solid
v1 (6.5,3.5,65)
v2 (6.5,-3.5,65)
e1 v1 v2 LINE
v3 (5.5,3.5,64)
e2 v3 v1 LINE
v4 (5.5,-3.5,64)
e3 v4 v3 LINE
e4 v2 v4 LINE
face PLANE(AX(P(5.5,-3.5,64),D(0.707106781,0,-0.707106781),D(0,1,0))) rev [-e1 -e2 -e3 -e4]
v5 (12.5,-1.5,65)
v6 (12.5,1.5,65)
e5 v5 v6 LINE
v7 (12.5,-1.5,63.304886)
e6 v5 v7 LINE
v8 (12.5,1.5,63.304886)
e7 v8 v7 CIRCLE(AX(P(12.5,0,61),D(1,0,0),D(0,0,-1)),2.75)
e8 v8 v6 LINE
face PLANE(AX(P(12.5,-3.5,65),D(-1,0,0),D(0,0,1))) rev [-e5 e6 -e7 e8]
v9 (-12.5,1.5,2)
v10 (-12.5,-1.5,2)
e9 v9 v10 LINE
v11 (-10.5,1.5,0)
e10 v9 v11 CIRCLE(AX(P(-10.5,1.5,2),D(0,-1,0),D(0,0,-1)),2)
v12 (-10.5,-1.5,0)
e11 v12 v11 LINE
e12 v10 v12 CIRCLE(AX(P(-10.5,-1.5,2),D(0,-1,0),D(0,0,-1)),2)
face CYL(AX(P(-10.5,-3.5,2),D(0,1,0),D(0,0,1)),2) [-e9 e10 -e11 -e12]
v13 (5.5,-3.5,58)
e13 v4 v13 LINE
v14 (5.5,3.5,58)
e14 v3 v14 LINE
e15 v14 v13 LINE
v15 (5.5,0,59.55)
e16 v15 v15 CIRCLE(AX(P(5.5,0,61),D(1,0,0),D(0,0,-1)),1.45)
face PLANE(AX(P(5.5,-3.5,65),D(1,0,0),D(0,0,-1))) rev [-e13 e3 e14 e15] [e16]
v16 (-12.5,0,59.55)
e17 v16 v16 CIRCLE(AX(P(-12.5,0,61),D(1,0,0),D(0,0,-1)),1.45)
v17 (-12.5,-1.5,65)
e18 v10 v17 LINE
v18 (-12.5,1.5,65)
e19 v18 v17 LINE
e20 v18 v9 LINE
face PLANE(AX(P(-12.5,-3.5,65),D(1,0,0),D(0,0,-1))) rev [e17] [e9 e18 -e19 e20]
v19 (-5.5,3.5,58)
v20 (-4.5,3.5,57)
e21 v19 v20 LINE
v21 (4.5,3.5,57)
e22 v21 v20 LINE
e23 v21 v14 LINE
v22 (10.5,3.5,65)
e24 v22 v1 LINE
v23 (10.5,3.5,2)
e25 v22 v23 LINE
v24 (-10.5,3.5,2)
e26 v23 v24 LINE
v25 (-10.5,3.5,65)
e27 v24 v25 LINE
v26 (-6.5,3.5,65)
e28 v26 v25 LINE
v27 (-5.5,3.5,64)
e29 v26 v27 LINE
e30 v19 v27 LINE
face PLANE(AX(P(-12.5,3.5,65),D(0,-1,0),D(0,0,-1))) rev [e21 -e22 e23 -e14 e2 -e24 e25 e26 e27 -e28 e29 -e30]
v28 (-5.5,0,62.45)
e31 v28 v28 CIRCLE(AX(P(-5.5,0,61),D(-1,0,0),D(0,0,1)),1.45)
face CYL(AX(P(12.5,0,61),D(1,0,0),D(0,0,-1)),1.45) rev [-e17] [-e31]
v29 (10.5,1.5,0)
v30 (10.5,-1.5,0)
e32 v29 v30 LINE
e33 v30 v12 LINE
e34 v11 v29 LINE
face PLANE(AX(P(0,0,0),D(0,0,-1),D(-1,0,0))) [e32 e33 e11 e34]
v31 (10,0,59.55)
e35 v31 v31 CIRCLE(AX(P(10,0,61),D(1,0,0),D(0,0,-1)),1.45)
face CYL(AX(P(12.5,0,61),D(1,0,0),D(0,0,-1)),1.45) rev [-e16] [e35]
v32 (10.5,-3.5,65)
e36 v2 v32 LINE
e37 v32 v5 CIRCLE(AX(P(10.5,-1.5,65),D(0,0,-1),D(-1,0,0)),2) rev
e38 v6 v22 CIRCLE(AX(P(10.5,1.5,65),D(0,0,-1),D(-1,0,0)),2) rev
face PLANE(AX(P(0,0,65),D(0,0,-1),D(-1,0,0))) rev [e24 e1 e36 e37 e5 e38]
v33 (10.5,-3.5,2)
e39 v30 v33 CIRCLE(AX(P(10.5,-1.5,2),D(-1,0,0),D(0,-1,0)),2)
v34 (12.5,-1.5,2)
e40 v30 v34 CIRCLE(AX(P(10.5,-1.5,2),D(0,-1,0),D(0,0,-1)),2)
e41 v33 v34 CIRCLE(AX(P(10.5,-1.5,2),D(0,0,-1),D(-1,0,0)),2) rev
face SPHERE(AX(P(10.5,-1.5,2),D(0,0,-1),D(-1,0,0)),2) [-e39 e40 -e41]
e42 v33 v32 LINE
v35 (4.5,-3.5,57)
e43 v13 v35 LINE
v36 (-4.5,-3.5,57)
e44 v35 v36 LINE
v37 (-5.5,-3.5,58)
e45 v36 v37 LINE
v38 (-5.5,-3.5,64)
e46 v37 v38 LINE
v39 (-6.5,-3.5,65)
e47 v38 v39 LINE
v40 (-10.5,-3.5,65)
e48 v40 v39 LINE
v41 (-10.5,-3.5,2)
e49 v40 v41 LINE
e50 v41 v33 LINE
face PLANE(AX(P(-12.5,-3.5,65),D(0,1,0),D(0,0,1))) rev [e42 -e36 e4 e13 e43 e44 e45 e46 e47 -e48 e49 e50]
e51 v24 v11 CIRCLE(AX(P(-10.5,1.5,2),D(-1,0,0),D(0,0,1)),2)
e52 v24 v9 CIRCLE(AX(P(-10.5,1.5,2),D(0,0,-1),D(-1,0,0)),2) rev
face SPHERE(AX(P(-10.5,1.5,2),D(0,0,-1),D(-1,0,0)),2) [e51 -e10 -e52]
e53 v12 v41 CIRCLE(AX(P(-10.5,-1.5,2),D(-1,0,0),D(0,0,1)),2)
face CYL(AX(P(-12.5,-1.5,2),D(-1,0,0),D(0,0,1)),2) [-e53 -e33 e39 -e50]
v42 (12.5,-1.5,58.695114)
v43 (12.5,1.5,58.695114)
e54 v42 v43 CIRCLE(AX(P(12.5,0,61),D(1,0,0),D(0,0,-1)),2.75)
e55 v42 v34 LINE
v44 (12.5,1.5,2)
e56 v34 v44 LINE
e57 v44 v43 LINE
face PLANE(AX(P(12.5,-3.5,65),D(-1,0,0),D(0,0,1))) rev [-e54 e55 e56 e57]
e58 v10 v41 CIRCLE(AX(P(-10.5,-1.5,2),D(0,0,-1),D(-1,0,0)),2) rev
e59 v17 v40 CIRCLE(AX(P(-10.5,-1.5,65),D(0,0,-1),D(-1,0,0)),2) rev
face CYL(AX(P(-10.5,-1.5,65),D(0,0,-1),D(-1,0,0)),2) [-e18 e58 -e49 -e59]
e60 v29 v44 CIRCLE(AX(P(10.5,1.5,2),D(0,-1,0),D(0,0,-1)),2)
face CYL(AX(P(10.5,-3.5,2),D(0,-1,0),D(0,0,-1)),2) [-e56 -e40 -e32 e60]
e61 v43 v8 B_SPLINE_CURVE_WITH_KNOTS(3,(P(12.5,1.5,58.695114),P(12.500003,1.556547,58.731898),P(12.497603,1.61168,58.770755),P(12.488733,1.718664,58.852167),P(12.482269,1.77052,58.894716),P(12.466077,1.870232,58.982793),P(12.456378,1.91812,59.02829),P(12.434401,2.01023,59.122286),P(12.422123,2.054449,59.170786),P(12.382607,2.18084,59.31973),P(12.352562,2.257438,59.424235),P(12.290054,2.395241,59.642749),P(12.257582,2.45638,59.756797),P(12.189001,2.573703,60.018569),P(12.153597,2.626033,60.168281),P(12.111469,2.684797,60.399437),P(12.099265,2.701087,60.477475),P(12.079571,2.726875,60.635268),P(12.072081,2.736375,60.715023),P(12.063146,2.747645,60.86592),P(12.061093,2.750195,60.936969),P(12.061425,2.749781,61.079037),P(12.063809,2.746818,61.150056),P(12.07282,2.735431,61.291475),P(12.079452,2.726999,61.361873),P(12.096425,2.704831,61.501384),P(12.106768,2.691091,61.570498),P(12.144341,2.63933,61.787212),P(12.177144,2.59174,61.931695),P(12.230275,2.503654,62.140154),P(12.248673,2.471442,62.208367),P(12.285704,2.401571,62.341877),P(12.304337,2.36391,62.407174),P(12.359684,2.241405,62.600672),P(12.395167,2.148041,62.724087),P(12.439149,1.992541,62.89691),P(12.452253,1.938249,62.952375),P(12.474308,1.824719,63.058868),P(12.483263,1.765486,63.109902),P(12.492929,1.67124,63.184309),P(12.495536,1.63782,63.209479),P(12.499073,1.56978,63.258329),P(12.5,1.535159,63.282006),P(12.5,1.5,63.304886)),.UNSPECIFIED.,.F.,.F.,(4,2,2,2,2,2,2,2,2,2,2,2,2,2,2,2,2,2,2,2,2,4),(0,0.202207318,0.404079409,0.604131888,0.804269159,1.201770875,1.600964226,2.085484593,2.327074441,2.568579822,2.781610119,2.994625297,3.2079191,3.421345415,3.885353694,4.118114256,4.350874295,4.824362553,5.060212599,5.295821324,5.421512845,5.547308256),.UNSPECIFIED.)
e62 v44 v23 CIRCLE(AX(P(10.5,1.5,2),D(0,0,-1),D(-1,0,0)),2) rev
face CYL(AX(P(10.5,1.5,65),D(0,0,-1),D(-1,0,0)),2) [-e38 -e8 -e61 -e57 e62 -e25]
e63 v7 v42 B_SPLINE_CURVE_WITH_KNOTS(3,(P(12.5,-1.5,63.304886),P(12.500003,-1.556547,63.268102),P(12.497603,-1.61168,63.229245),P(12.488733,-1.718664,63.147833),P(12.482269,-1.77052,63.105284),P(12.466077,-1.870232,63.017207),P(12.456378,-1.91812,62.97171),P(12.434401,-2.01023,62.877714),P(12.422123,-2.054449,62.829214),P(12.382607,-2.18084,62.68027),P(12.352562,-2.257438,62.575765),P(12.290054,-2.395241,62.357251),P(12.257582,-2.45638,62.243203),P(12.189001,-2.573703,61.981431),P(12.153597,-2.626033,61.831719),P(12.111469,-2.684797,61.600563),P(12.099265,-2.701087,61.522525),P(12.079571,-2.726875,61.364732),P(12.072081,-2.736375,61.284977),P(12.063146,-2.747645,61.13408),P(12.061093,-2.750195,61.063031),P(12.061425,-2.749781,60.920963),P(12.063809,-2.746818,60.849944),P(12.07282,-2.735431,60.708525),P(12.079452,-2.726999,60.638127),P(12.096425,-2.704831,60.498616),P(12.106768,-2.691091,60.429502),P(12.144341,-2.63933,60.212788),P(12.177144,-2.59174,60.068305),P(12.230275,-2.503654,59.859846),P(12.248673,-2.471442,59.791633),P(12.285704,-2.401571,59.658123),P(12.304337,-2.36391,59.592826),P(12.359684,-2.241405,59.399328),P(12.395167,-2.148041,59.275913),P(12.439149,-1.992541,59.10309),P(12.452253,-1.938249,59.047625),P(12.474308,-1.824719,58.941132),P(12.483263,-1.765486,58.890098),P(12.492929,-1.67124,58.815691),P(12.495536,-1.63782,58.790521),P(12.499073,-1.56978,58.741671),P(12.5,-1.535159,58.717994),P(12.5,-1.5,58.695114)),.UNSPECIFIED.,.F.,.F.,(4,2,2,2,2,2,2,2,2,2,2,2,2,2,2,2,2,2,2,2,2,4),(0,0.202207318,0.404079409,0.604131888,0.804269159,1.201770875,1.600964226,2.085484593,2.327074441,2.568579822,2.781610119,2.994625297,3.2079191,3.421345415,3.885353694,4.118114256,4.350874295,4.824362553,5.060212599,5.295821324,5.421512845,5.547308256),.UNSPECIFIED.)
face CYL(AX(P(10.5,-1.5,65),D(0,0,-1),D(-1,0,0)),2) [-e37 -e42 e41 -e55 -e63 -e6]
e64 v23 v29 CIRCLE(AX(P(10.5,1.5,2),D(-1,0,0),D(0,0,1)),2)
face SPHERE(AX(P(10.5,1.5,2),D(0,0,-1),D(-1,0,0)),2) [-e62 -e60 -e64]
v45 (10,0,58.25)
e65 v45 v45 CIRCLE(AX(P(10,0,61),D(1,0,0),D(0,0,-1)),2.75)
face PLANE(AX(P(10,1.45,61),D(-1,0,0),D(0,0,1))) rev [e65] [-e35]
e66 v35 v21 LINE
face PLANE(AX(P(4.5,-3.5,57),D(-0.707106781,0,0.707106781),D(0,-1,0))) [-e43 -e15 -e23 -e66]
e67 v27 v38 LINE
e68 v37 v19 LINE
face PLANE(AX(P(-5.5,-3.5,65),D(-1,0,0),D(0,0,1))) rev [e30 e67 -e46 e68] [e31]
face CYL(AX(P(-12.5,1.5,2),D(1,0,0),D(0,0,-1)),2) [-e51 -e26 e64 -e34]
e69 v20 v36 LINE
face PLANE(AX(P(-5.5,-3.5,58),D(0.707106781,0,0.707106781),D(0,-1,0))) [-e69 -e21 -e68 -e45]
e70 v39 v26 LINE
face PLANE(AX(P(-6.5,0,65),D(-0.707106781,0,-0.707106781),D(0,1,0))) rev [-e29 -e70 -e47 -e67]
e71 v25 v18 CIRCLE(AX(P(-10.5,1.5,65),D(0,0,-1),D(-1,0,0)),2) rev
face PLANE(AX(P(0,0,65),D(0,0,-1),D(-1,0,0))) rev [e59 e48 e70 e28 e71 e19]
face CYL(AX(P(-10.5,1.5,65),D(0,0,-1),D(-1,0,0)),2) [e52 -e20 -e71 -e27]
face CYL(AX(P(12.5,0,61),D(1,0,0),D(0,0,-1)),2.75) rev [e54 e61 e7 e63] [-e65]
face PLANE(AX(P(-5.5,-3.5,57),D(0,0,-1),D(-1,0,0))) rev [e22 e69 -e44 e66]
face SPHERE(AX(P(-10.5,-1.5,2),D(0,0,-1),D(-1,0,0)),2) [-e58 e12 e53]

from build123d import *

# Parameters (mm, degrees)
SKETCH1_W                        = 25
SKETCH1_H                        = 7
BOSS_EXTRUDE1_DEPTH              = 65
SKETCH2_W                        = 11
SKETCH2_H                        = 8
CUT_EXTRUDE1_DEPTH               = 67.560123197
CHAMFER1_SIZE                    = 1
CBORE_FOR_M2_5_SHCS2_D           = 2.9
CBORE_FOR_M2_5_SHCS2_CBORE_D     = 5.5
CBORE_FOR_M2_5_SHCS2_CBORE_DEPTH = 2.5
FILLET1_R                        = 2
FILLET2_R                        = 2
CHAMFER2_SIZE                    = 1


with BuildPart() as part:
    # Sketch1 → Boss-Extrude1 (new body)
    with BuildSketch(Plane.XY):
        Rectangle(SKETCH1_W, SKETCH1_H)
    extrude(amount=BOSS_EXTRUDE1_DEPTH)

    # Sketch2 → Cut-Extrude1 (cut, through all)
    with BuildSketch(Plane(origin=(0, 3.5, 0), x_dir=(1, 0, 0), z_dir=(0, 1, 0))):
        with Locations((0, -61)):
            Rectangle(SKETCH2_W, SKETCH2_H)
    extrude(amount=-CUT_EXTRUDE1_DEPTH, mode=Mode.SUBTRACT)

    # Chamfer1
    chamfer1_edges = [part.edges().sort_by_distance(p)[0] for p in [
        (-5.5, 0, 57),
        (5.5, 0, 57),
    ]]
    chamfer(chamfer1_edges, length=CHAMFER1_SIZE)

    # CBORE for M2.5 SHCS2 (through all)
    with Locations(Plane(origin=(12.5, -6.575007997, 116.706532938), x_dir=(0, 0, -1), z_dir=(1, 0, 0))):
        with Locations((55.706532938, 6.575007997)):
            CounterBoreHole(CBORE_FOR_M2_5_SHCS2_D / 2, CBORE_FOR_M2_5_SHCS2_CBORE_D / 2, CBORE_FOR_M2_5_SHCS2_CBORE_DEPTH)

    # Fillet1
    # the kernel refuses this fillet: 2 mm, written as the material it takes off along each edge
    with BuildSketch(Plane(origin=(12.5, -3.5, -5), x_dir=(-1, 0, 0), z_dir=(0, 0, 1)), Plane(origin=(12.5, 3.5, -5), x_dir=(0, -1, 0), z_dir=(0, 0, 1))) as fillet1_piece_1:
        with BuildLine():
            CenterArc((FILLET1_R, -FILLET1_R), FILLET1_R, 90, 90)
            Line((0, -FILLET1_R), (0, 0))
            Line((0, 0), (FILLET1_R, 0))
        make_face()
    extrude(amount=75, mode=Mode.SUBTRACT)
    with BuildSketch(Plane(origin=(-12.5, -3.5, -5), x_dir=(1, 0, 0), z_dir=(0, 0, 1)), Plane(origin=(-12.5, 3.5, -5), x_dir=(0, -1, 0), z_dir=(0, 0, 1))) as fillet1_piece_2:
        with BuildLine():
            CenterArc((FILLET1_R, FILLET1_R), FILLET1_R, 180, 90)
            Line((0, FILLET1_R), (0, 0))
            Line((0, 0), (FILLET1_R, 0))
        make_face()
    extrude(amount=75, mode=Mode.SUBTRACT)

    # Fillet2
    fillet2_edges = [part.edges().sort_by_distance(p)[0] for p in [
        (-12.5, 0, 0),
        (12.5, 0, 0),
        (0, -3.5, 0),
        (0, 3.5, 0),
        (11.914213562, -2.914213562, 0),
        (-11.914213562, -2.914213562, 0),
        (11.914213562, 2.914213562, 0),
        (-11.914213562, 2.914213562, 0),
    ]]
    fillet(fillet2_edges, radius=FILLET2_R)

    # Chamfer2
    chamfer2_edges = [part.edges().sort_by_distance(p)[0] for p in [
        (-5.5, 0, 65),
        (5.5, 0, 65),
    ]]
    chamfer(chamfer2_edges, length=CHAMFER2_SIZE)


solid = part.part
